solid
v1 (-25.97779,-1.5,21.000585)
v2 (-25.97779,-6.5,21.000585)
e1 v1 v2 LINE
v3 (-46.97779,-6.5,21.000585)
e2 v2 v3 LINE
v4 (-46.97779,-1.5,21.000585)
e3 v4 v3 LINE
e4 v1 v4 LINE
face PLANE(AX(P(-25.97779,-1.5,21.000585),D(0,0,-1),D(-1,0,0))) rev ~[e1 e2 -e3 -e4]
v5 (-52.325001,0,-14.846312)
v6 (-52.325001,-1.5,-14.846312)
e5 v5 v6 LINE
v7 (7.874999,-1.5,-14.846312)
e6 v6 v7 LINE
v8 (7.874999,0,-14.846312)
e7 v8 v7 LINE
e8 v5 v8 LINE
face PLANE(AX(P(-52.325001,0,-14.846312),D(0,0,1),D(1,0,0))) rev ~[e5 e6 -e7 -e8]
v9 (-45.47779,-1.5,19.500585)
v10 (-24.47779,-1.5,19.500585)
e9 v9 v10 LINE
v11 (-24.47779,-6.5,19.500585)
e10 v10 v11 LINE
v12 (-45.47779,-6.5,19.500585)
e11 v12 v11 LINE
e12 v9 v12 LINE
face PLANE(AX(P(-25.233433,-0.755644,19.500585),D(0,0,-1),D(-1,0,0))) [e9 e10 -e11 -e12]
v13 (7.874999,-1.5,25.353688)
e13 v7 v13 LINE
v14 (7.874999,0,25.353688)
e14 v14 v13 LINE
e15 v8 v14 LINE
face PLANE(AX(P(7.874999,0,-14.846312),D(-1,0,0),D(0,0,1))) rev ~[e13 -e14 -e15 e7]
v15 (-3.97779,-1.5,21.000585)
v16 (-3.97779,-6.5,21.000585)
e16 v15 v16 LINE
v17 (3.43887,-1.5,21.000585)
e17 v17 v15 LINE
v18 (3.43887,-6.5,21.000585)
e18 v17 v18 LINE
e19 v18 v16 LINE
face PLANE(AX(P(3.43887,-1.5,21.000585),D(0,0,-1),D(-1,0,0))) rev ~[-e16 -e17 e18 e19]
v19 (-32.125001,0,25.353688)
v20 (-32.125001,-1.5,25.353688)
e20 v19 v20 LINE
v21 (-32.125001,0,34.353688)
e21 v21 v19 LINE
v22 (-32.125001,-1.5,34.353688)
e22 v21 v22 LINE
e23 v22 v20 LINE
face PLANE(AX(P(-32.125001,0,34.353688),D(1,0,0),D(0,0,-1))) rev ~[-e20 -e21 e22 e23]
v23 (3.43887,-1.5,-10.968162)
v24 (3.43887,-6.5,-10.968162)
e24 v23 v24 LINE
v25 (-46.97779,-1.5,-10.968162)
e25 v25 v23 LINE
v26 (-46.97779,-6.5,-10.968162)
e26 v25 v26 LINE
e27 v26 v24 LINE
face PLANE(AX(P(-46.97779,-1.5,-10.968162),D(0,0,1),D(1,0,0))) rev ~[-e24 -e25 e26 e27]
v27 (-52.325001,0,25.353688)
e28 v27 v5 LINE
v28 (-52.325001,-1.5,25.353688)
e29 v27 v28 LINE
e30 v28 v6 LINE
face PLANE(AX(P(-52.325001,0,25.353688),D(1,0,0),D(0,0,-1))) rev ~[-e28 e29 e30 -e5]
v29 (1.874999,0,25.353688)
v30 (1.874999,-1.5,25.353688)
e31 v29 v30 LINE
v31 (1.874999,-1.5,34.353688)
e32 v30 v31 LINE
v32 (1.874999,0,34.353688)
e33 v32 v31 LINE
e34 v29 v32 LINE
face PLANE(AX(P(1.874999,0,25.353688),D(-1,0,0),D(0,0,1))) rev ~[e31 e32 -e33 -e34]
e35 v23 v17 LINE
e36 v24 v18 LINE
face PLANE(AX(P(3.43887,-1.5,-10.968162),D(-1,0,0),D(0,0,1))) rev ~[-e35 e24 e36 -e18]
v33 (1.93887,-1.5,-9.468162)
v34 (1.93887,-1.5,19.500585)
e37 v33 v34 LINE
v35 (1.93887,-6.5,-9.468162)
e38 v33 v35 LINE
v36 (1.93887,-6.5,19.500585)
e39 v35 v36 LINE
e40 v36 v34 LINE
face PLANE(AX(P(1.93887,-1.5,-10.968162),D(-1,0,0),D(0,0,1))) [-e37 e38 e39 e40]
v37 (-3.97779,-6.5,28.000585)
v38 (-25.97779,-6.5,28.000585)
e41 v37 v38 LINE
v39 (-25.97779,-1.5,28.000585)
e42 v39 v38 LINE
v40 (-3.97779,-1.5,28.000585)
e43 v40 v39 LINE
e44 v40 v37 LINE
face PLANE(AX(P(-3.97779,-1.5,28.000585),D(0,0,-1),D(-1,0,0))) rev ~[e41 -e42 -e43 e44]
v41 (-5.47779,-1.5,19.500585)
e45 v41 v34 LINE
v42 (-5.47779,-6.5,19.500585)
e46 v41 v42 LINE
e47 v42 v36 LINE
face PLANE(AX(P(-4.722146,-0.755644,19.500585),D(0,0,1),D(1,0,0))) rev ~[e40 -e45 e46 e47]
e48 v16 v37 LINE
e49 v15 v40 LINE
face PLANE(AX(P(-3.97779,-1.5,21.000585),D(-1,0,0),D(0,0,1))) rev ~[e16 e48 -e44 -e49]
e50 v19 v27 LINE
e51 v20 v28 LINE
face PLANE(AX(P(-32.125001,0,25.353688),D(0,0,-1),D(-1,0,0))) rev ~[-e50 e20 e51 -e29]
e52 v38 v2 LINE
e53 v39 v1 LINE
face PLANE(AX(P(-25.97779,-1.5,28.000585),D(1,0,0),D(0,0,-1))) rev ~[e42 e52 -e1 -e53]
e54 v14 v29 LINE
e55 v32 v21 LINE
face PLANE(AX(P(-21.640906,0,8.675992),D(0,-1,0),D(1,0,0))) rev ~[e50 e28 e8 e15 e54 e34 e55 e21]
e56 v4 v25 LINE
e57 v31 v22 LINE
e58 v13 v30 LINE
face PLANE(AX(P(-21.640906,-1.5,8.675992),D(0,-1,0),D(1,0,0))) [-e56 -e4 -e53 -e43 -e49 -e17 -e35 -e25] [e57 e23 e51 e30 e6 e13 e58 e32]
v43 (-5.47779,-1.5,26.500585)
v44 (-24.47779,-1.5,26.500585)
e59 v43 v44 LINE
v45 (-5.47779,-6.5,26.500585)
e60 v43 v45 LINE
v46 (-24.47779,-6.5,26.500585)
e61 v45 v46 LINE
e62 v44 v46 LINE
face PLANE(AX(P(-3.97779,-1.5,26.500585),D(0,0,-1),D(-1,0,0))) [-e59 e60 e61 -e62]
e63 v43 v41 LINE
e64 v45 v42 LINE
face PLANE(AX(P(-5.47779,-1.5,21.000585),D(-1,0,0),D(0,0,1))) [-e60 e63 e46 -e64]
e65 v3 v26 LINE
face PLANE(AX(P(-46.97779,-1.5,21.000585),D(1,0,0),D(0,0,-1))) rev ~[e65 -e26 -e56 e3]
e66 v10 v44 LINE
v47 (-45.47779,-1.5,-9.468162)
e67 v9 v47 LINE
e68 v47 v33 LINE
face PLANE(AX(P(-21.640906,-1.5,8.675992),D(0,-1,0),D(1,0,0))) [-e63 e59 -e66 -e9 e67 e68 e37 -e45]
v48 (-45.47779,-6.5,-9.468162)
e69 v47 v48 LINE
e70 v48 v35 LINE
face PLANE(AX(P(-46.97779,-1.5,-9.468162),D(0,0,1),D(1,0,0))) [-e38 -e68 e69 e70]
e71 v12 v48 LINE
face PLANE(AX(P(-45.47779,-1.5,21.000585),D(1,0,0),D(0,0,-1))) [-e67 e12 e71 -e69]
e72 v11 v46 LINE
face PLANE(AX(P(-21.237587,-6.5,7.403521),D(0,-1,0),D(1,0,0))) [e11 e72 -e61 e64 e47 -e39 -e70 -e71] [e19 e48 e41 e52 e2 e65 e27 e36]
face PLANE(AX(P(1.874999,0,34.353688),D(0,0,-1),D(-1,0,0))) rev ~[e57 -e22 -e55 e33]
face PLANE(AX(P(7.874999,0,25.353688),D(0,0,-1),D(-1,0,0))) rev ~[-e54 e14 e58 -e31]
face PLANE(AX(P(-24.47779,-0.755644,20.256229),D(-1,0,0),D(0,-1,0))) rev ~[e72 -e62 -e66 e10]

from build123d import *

# Parameters (mm, degrees)
F1_DEPTH     = 1.5
F3_DEPTH     = 5
F4_T         = 1.5
F4_T3_DEPTH  = 4.5
F4_T5_DEPTH  = 10.4166599398
F4_T7_DEPTH  = 10
F4_T9_DEPTH  = 25
F4_T11_DEPTH = 24
F4_T13_DEPTH = 34.9687469041
F4_T15_DEPTH = 53.4166599398
F4_T17_DEPTH = 8


# Not quite as in the source:
# - a shell that OpenCascade refuses in one call is made with other operations: the cavity is built on its own and cut out


with BuildPart() as f1:
    # F0 (on Front) → F1 (new body)
    with BuildSketch(Plane.XZ):
        Polygon((-52.3250011176, 25.3536881179), (-52.3250011176, -14.8463118821), (7.8749988824, -14.8463118821), (7.8749988824, 25.3536881179), (1.8749988824, 25.3536881179), (1.8749988824, 34.3536881179), (-32.1250011176, 34.3536881179), (-32.1250011176, 25.3536881179), align=None)
    extrude(amount=F1_DEPTH)

    # F2 (on face) → F3 (join)
    with BuildSketch(Plane.XZ.offset(1.5)):
        Polygon((-46.9777897949, 21.0005849694), (-46.9777897949, -10.9681619347), (3.4388701449, -10.9681619347), (3.4388701449, 21.0005849694), (-3.9777897949, 21.0005849694), (-3.9777897949, 28.0005849694), (-25.9777897949, 28.0005849694), (-25.9777897949, 21.0005849694), align=None)
    extrude(amount=F3_DEPTH)

    # F4: shell of thickness 1.5, made by hand


with BuildPart() as f4_core1:
    # F4_t2: copy of F1
    add(f1.part)

    # the walls: a layer under each face that stays
    f4_faces = [f4_core1.faces().sort_by_distance(p)[0] for p in [
        (-42.2250011176, -0.75, 25.3536881179),
        (-32.1250011176, -0.75, 29.8536881179),
        (-52.3250011176, -0.75, 5.2536881179),
        (-22.2250011176, 0, 9.7536881179),
        (-2.1583344509, -1.5, 26.1536881179),
        (-15.1250011176, -0.75, 34.3536881179),
        (-22.2250011176, -0.75, -14.8463118821),
        (7.8749988824, -0.75, 5.2536881179),
        (4.8749988824, -0.75, 25.3536881179),
        (1.8749988824, -0.75, 29.8536881179),
        (-0.269459825, -4, 21.0005849694),
        (-3.9777897949, -4, 24.5005849694),
        (-14.9777897949, -4, 28.0005849694),
        (-25.9777897949, -4, 24.5005849694),
        (-36.4777897949, -4, 21.0005849694),
        (-46.9777897949, -4, 5.0162115173),
        (-21.769459825, -4, -10.9681619347),
        (3.4388701449, -4, 5.0162115173),
    ]]
    thicken(f4_faces, amount=-F4_T, mode=Mode.SUBTRACT)

    # F4_s4 → F4_t3 (cut)
    with BuildSketch(Plane.XZ.offset(-1.5)):
        Polygon((-32.1400011176, 25.3686881179), (-32.1250011176, 23.8536881179), (-30.6250011176, 23.8536881179), (-30.6250011176, 25.3536881179), align=None)
        Polygon((1.8899988824, 25.3686881179), (1.8749988824, 23.8536881179), (0.3749988824, 23.8536881179), (0.3749988824, 25.3536881179), align=None)
    extrude(amount=F4_T3_DEPTH, mode=Mode.SUBTRACT)

    # F4_s6 → F4_t5 (cut)
    with BuildSketch(Plane.YZ.offset(-5.4777897949)):
        Polygon((-1.515, 21.0155849694), (0, 21.0005849694), (0, 19.5005849694), (-1.5, 19.5005849694), align=None)
    extrude(amount=F4_T5_DEPTH, mode=Mode.SUBTRACT)

    # F4_s8 → F4_t7 (cut)
    with BuildSketch(Plane.XY.offset(19.5005849694)):
        Polygon((-3.9627897949, -1.515), (-3.9777897949, 0), (-5.4777897949, 0), (-5.4777897949, -1.5), align=None)
        Polygon((-25.9927897949, -1.515), (-25.9777897949, 0), (-24.4777897949, 0), (-24.4777897949, -1.5), align=None)
    extrude(amount=F4_T7_DEPTH, mode=Mode.SUBTRACT)

    # F4_s10 → F4_t9 (cut)
    with BuildSketch(Plane.YZ.offset(-27.4777897949)):
        Polygon((-1.515, 28.0155849694), (0, 28.0005849694), (0, 26.5005849694), (-1.5, 26.5005849694), align=None)
    extrude(amount=F4_T9_DEPTH, mode=Mode.SUBTRACT)

    # F4_s12 → F4_t11 (cut)
    with BuildSketch(Plane.YZ.offset(-48.4777897949)):
        Polygon((-1.515, 21.0155849694), (0, 21.0005849694), (0, 19.5005849694), (-1.5, 19.5005849694), align=None)
    extrude(amount=F4_T11_DEPTH, mode=Mode.SUBTRACT)

    # F4_s14 → F4_t13 (cut)
    with BuildSketch(Plane.XY.offset(-12.4681619347)):
        Polygon((-46.9927897949, -1.515), (-46.9777897949, 0), (-45.4777897949, 0), (-45.4777897949, -1.5), align=None)
        Polygon((3.4538701449, -1.515), (3.4388701449, 0), (1.9388701449, 0), (1.9388701449, -1.5), align=None)
    extrude(amount=F4_T13_DEPTH, mode=Mode.SUBTRACT)

    # F4_s16 → F4_t15 (cut)
    with BuildSketch(Plane.YZ.offset(-48.4777897949)):
        Polygon((-1.515, -10.9831619347), (0, -10.9681619347), (0, -9.4681619347), (-1.5, -9.4681619347), align=None)
    extrude(amount=F4_T15_DEPTH, mode=Mode.SUBTRACT)

    # F4_s18 → F4_t17 (cut)
    with BuildSketch(Plane.XZ):
        Polygon((-3.9627897949, 21.0155849694), (-3.9777897949, 19.5005849694), (-5.4777897949, 19.5005849694), (-5.4777897949, 21.0005849694), align=None)
        Polygon((-25.9927897949, 21.0155849694), (-24.4777897949, 21.0005849694), (-24.4777897949, 19.5005849694), (-25.9777897949, 19.5005849694), align=None)
    extrude(amount=F4_T17_DEPTH, mode=Mode.SUBTRACT)


with BuildPart() as f1_1:
    add(f1.part)

    # what is left inside the walls is the cavity
    f4_cavity = [f4_core1.part.solids().sort_by_distance(p)[0] for p in [
        (-21.76946, -1.515, 2.52142),
    ]]
    add(f4_cavity, mode=Mode.SUBTRACT)


solid = f1_1.part
